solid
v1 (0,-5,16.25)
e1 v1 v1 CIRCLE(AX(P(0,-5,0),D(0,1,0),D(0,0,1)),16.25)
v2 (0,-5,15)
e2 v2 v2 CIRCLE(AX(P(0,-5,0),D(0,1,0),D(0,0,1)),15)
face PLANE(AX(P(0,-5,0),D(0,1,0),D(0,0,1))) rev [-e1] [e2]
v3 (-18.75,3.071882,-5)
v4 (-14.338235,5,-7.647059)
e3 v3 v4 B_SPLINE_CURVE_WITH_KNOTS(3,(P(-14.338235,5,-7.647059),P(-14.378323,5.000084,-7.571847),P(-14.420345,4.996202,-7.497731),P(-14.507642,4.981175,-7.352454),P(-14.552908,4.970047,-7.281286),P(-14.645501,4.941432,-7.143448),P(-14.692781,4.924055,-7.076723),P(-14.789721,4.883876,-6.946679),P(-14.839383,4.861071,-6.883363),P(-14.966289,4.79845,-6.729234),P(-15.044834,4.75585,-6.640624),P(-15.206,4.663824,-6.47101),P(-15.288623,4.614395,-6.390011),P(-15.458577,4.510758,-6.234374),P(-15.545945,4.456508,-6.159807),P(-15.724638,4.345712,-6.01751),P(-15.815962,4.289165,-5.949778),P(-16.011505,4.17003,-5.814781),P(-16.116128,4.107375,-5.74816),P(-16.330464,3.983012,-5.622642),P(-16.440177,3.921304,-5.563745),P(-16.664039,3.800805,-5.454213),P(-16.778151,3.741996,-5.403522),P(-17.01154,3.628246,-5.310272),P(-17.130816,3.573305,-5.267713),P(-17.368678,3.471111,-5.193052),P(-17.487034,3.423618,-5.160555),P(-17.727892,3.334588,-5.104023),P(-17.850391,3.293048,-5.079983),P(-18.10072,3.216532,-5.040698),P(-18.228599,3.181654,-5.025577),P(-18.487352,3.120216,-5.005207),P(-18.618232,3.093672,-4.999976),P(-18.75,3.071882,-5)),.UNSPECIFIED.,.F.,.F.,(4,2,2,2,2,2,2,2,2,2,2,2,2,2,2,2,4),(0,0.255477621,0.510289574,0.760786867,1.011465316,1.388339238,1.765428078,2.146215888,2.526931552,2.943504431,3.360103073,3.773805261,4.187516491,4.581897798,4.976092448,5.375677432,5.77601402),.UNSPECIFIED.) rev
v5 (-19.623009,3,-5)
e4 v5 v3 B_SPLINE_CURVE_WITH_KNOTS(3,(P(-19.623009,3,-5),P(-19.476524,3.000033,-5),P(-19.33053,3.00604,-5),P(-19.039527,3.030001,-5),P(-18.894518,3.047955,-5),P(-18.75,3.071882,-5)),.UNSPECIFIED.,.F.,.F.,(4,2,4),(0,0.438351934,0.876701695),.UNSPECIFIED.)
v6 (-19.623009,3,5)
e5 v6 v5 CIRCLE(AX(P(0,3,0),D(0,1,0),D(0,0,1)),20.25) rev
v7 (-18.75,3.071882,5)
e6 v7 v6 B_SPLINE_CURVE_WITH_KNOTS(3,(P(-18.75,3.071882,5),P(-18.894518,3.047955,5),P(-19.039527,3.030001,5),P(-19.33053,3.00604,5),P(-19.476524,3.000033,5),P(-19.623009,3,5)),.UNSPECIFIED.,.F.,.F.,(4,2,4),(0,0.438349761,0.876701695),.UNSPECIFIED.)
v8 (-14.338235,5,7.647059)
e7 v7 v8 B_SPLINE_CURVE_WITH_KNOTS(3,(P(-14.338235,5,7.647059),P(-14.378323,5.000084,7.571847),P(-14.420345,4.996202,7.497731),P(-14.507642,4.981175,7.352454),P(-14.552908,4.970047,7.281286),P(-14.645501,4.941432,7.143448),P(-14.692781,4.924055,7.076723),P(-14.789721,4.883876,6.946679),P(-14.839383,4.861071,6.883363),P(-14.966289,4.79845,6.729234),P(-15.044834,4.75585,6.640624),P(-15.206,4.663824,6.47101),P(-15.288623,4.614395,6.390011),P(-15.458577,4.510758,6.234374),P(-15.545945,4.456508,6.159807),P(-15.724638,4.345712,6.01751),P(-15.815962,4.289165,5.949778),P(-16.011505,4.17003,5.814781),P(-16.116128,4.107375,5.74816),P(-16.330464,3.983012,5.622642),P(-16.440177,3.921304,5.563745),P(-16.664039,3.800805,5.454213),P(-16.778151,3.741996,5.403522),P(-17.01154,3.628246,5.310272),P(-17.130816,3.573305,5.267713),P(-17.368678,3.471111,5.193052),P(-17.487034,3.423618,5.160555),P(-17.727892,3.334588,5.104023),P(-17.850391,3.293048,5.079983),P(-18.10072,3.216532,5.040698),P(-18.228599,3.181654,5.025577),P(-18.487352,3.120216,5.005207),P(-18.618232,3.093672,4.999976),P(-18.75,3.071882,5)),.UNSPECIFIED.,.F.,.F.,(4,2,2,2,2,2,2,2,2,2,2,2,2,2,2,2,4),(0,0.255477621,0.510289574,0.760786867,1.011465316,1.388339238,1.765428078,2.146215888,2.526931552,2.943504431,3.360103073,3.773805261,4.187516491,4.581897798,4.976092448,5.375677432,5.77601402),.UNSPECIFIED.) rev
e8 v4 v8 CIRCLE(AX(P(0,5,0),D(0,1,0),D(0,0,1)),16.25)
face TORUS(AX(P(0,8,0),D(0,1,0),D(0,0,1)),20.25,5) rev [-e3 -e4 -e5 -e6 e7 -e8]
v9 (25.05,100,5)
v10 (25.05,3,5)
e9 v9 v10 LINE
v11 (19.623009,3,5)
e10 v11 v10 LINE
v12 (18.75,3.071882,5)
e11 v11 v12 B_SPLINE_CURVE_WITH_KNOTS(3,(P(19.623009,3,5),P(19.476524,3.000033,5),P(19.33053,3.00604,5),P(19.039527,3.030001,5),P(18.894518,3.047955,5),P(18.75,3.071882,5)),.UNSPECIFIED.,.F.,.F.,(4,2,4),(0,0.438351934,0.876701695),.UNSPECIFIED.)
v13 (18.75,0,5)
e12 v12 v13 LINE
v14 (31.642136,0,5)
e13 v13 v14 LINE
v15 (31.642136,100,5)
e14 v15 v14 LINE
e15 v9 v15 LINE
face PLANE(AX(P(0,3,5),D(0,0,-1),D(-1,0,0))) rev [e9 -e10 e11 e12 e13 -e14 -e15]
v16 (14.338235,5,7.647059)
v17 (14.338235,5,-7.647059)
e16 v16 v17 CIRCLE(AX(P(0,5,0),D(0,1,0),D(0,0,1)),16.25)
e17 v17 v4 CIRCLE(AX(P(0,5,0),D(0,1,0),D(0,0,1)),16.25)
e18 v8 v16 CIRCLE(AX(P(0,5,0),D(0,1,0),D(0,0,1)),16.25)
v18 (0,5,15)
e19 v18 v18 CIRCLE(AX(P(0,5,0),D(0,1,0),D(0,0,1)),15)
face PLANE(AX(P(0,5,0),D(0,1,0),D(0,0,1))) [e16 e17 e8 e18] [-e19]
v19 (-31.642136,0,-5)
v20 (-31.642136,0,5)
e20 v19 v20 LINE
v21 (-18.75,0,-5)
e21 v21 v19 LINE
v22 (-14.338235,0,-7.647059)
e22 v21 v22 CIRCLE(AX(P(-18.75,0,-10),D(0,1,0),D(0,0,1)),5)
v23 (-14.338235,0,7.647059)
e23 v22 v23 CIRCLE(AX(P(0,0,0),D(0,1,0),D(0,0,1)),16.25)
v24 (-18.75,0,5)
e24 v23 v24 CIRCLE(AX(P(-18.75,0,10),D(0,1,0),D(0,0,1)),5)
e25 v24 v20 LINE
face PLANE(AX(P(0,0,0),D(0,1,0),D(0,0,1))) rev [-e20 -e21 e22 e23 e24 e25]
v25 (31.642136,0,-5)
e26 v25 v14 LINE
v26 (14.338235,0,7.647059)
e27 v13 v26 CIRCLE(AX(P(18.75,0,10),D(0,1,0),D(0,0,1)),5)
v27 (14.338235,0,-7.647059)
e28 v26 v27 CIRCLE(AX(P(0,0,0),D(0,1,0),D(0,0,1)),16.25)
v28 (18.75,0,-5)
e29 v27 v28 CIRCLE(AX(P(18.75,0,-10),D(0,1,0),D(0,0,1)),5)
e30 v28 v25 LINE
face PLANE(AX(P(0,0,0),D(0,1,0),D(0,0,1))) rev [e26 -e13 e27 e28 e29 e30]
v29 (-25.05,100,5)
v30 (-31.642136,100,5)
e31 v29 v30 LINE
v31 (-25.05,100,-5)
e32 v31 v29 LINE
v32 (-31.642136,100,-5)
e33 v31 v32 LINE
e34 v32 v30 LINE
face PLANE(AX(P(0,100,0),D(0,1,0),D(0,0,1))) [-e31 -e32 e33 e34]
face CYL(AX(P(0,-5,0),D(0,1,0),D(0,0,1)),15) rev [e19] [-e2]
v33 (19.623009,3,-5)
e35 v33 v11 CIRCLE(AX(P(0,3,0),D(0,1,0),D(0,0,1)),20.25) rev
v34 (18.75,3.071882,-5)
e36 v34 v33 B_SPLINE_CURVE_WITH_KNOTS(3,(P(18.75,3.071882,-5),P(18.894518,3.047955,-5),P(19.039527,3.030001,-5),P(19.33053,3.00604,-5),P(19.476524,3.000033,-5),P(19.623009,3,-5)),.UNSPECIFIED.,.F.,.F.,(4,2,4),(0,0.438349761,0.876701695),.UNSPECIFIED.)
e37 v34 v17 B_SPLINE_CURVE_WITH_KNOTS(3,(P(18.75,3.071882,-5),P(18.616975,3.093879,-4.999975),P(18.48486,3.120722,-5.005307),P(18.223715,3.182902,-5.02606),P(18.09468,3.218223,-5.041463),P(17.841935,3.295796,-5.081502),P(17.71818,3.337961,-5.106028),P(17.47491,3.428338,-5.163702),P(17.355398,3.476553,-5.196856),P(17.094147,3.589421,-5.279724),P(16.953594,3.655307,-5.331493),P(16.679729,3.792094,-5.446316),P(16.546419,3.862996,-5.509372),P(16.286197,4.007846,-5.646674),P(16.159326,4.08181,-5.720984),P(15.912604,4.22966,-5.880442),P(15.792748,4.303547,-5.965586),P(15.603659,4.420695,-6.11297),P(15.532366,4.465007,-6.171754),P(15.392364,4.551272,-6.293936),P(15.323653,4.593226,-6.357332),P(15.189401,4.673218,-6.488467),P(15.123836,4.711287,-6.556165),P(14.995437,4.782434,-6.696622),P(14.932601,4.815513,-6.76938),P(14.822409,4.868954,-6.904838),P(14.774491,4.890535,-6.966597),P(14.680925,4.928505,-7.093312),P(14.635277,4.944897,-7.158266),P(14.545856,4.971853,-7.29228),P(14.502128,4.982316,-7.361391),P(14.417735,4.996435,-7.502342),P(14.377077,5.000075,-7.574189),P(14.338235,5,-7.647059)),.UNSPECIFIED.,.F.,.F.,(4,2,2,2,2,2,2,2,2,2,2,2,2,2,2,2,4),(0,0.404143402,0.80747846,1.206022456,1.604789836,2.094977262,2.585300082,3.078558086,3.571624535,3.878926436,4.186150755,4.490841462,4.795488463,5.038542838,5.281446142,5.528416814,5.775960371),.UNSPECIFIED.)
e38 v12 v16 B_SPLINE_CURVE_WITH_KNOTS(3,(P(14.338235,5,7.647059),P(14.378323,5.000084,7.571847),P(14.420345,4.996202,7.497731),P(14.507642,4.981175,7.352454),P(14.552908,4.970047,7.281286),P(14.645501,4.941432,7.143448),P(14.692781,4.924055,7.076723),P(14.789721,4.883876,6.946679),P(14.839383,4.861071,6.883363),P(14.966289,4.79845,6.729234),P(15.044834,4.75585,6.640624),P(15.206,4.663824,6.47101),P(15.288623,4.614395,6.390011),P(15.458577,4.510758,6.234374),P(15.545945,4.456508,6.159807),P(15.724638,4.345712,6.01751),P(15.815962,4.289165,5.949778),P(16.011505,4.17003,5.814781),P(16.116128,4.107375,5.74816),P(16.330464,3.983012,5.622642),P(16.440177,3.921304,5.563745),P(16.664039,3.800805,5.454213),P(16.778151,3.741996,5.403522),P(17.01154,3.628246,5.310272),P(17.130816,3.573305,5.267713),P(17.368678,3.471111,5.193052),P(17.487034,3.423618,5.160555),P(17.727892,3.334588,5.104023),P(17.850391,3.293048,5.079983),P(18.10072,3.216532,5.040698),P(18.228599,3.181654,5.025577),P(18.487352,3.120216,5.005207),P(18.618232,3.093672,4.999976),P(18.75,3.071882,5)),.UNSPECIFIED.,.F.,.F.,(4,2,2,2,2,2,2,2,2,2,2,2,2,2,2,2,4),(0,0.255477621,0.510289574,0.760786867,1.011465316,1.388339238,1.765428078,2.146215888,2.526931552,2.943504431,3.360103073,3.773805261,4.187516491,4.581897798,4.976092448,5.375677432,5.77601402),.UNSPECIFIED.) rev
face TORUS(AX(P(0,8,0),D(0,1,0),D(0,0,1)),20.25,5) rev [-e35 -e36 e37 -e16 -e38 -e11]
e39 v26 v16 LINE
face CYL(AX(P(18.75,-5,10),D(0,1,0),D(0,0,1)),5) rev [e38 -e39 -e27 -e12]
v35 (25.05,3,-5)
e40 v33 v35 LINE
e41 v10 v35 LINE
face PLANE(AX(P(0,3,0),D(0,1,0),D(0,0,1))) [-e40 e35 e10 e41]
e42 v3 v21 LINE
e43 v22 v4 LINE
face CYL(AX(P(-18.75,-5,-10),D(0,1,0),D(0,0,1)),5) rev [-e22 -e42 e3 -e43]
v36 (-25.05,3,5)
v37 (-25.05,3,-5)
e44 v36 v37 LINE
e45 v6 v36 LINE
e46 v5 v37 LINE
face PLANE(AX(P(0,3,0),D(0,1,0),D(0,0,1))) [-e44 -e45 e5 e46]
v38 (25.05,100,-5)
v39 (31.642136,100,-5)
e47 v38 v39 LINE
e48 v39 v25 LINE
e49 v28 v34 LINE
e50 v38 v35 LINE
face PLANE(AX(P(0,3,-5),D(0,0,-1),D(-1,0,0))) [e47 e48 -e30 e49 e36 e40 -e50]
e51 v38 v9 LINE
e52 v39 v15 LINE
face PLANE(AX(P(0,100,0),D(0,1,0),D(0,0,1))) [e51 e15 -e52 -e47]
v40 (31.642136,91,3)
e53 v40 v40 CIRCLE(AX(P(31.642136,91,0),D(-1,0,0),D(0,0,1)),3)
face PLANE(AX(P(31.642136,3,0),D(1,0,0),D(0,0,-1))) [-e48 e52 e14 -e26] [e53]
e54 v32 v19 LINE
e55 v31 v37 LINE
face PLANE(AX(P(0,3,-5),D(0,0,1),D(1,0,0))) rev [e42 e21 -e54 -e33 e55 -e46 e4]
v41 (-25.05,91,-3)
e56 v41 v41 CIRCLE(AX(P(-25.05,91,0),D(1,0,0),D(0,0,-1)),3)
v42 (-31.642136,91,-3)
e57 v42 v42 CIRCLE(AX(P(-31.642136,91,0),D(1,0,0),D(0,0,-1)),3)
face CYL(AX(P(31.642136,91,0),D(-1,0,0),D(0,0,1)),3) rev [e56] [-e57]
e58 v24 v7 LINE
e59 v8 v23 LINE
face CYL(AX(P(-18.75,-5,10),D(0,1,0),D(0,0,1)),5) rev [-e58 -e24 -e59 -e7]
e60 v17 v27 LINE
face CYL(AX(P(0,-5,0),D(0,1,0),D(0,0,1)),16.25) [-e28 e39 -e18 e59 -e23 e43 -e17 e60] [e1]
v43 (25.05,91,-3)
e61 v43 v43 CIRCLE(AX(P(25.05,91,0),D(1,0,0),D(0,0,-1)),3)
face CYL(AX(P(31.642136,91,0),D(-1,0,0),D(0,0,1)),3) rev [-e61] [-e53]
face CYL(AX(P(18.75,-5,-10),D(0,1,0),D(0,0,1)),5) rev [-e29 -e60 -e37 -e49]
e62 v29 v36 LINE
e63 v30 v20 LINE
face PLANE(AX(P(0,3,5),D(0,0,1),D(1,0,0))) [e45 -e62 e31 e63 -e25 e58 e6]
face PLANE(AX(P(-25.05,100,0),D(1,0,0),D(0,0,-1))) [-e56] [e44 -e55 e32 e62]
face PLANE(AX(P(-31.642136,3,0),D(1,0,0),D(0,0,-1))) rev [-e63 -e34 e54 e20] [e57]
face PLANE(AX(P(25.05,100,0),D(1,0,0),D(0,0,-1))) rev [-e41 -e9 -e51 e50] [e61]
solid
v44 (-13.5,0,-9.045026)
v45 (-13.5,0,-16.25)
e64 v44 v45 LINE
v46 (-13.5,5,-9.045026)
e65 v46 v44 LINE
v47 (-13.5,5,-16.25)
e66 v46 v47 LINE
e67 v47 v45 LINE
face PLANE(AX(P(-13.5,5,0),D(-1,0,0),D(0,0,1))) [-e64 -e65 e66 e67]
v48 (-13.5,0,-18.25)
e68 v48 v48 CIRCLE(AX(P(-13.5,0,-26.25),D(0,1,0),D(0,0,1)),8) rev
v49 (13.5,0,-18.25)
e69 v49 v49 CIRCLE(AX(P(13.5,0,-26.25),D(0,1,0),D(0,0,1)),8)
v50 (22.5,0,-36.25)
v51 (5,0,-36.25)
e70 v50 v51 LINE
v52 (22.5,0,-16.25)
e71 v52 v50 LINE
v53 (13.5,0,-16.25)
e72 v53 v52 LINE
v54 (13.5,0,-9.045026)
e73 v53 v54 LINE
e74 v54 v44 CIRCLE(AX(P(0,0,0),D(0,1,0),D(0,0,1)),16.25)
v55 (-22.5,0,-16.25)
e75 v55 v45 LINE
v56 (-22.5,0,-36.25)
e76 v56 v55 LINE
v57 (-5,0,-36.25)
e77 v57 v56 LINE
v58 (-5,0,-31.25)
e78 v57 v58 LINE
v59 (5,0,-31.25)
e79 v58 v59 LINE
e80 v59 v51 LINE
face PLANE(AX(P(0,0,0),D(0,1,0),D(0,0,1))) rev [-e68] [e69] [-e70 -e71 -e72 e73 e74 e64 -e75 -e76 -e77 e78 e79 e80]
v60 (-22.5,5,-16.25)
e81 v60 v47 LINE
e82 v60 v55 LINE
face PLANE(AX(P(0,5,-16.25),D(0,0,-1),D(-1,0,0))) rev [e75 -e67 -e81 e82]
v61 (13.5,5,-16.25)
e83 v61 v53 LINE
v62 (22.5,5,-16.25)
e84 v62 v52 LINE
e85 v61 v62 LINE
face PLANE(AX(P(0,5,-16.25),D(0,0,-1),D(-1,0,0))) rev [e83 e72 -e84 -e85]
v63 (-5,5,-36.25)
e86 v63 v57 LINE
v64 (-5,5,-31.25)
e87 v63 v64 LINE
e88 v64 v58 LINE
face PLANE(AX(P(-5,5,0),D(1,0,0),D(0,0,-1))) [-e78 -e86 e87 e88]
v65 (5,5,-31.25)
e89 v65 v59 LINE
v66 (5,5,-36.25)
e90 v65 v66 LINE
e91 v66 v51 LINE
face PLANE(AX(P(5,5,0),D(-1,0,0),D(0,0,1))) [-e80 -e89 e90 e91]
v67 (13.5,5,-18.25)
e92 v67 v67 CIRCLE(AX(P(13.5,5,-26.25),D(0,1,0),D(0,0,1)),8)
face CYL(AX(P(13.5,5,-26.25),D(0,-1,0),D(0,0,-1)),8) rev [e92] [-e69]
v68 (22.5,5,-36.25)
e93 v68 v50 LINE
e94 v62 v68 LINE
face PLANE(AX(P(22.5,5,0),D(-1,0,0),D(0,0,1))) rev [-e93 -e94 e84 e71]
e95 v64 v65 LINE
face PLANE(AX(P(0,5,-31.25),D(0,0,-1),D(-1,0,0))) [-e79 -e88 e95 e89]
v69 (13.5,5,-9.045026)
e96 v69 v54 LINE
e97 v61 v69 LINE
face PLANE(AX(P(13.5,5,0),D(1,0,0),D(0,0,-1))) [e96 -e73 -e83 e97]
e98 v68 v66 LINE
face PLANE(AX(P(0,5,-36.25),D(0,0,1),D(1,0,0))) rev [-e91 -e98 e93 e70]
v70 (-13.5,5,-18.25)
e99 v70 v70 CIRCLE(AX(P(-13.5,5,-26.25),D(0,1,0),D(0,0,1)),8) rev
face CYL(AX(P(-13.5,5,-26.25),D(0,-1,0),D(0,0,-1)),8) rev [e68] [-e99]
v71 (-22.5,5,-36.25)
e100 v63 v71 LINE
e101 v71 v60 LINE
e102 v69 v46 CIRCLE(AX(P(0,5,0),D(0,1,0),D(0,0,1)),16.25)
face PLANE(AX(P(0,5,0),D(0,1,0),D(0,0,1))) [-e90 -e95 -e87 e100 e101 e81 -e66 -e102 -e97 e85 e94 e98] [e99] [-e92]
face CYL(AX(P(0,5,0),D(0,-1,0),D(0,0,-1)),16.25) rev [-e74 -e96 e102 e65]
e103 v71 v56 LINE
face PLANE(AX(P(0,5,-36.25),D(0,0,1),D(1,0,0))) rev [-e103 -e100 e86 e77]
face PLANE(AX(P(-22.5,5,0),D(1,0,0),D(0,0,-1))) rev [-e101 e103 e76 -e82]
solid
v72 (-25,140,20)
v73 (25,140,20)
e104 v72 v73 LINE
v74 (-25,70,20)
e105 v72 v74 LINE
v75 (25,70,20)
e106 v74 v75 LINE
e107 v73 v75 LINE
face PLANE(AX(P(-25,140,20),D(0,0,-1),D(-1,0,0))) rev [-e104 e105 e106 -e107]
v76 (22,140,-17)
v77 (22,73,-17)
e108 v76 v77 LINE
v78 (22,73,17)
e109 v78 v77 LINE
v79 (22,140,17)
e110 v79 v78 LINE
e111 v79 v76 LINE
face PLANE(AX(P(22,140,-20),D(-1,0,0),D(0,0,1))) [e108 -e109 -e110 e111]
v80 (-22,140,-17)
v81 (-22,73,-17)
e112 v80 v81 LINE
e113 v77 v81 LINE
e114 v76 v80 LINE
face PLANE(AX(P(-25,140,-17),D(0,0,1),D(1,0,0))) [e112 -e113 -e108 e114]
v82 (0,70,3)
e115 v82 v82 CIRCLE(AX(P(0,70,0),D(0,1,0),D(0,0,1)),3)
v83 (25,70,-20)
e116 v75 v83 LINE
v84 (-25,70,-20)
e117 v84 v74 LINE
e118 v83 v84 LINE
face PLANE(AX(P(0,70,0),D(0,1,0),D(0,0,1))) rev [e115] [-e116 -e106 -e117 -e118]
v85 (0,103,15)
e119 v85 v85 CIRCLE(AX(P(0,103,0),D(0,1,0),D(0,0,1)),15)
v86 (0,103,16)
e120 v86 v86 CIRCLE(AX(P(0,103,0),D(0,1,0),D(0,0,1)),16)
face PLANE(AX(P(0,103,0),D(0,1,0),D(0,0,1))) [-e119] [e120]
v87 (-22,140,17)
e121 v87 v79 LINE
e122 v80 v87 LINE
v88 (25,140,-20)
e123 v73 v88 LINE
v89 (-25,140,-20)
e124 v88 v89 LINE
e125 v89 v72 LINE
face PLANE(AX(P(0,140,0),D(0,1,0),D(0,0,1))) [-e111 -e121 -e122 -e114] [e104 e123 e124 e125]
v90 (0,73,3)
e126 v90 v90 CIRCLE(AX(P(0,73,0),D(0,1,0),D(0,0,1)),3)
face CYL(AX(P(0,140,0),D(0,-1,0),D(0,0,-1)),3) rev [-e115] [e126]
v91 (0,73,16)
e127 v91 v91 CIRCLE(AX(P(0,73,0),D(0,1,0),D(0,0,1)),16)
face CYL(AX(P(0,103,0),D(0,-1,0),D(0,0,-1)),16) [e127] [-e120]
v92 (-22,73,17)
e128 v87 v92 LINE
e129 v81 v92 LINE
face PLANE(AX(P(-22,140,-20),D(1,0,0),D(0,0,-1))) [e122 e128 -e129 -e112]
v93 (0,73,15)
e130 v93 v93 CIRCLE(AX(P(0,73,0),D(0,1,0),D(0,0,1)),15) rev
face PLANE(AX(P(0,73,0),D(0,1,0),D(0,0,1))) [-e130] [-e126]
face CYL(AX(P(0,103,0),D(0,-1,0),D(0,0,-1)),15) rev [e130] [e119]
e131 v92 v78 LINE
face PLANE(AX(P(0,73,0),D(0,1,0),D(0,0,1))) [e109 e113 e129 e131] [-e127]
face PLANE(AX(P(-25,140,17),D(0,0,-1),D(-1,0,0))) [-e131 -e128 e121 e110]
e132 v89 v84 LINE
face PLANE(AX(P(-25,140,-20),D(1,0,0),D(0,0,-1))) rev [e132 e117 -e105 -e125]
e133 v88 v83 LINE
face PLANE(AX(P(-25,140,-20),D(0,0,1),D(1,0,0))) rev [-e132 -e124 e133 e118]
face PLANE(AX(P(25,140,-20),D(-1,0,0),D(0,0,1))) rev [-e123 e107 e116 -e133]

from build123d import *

# Parameters (mm, degrees)
CONNECTOR_SLEEVE_DEPTH        = 5
CONNECTOR_SLEEVE_DEPTH_BACK   = 5
SKETCH3_W                     = 50
SKETCH3_H                     = 40
SKETCH3_R                     = 3
MOTOR_CASING_DEPTH            = 70
SHELL4_T                      = -3
SKETCH6_R                     = 16
SKETCH6_R_2                   = 15
MOTOR_SITS_HERE_DEPTH         = 30
SKETCH2_16_W                  = 6.592135624
SKETCH2_16_H                  = 10
SLEEVE_CASING_CONNECTOR_DEPTH = 3
SKETCH2_17_W                  = 6.592135624
SKETCH2_17_H                  = 10
SLEEVE_CASING_ARMS_DEPTH      = 100
SKETCH2_10_R                  = 8
SENSOR_HOLDER_DEPTH           = 5
FILLET2_R                     = 5
CUT_EXTRUDE5_DEPTH            = 124.769792437
CUT_EXTRUDE5_DEPTH_BACK       = 124.769792437
SKETCH8_R                     = 3


with BuildPart() as part:
    # Sketch2 → Connector sleeve (new, two sides: drawn at the far end of the back side and taken through both)
    with BuildSketch(Plane(origin=(0, 0, 0), x_dir=(1, 0, 0), z_dir=(0, 1, 0)).offset(-CONNECTOR_SLEEVE_DEPTH_BACK)):
        with BuildLine():
            Line((-14.142135624, -5), (-15.461646096, -5))
            ThreePointArc((-15.461646096, -5), (0, -16.25), (15.461646096, -5))
            Line((15.461646096, -5), (14.142135624, -5))
            ThreePointArc((14.142135624, -5), (0, -15), (-14.142135624, -5))
        make_face()
        with BuildLine():
            ThreePointArc((-13.5, 9.045026258), (-14.62138145, 7.090677295), (-15.461646096, 5))
            Line((-15.461646096, 5), (-14.142135624, 5))
            ThreePointArc((-14.142135624, 5), (0, 15), (14.142135624, 5))
            Line((14.142135624, 5), (15.461646096, 5))
            ThreePointArc((15.461646096, 5), (14.62138145, 7.090677295), (13.5, 9.045026258))
            ThreePointArc((13.5, 9.045026258), (7.651170607, 14.336041586), (0, 16.25))
            ThreePointArc((0, 16.25), (-7.651170607, 14.336041586), (-13.5, 9.045026258))
        make_face()
        with BuildLine():
            Line((15.461646096, 5), (14.142135624, 5))
            ThreePointArc((14.142135624, 5), (14.783978395, 2.536529681), (15, 0))
            ThreePointArc((15, 0), (14.783978395, -2.536529681), (14.142135624, -5))
            Line((14.142135624, -5), (15.461646096, -5))
            ThreePointArc((15.461646096, -5), (16.051701609, -2.530884326), (16.25, 0))
            ThreePointArc((16.25, 0), (16.051701609, 2.530884326), (15.461646096, 5))
        make_face()
        with BuildLine():
            Line((-14.142135624, 5), (-15.461646096, 5))
            ThreePointArc((-15.461646096, 5), (-16.25, 0), (-15.461646096, -5))
            Line((-15.461646096, -5), (-14.142135624, -5))
            ThreePointArc((-14.142135624, -5), (-15, 0), (-14.142135624, 5))
        make_face()
    extrude(amount=CONNECTOR_SLEEVE_DEPTH + CONNECTOR_SLEEVE_DEPTH_BACK)

    # Sketch2<16> → Sleeve-casing connector (add)
    with BuildSketch(Plane(origin=(0, 0, 0), x_dir=(1, 0, 0), z_dir=(0, 1, 0))):
        with BuildLine():
            Line((-15.461646096, 5), (-25.05, 5))
            Line((-25.05, 5), (-25.05, -5))
            Line((-25.05, -5), (-15.461646096, -5))
            ThreePointArc((-15.461646096, -5), (-16.25, 0), (-15.461646096, 5))
        make_face()
        with Locations((-28.346067812, 0)):
            Rectangle(SKETCH2_16_W, SKETCH2_16_H)
        with BuildLine():
            ThreePointArc((16.25, 0), (16.051701609, -2.530884326), (15.461646096, -5))
            Line((15.461646096, -5), (25.05, -5))
            Line((25.05, -5), (25.05, 5))
            Line((25.05, 5), (15.461646096, 5))
            ThreePointArc((15.461646096, 5), (16.051701609, 2.530884326), (16.25, 0))
        make_face()
        with Locations((28.346067812, 0)):
            Rectangle(SKETCH2_16_W, SKETCH2_16_H)
    extrude(amount=SLEEVE_CASING_CONNECTOR_DEPTH)

    # Sketch2<17> → Sleeve-casing arms (add)
    with BuildSketch(Plane(origin=(0, 0, 0), x_dir=(1, 0, 0), z_dir=(0, 1, 0))):
        with Locations((-28.346067812, 0)):
            Rectangle(SKETCH2_17_W, SKETCH2_17_H)
        with Locations((28.346067812, 0)):
            Rectangle(SKETCH2_17_W, SKETCH2_17_H)
    extrude(amount=SLEEVE_CASING_ARMS_DEPTH)

    # Fillet2
    # the kernel refuses this fillet: 5 mm, written as the material it adds along each edge
    with BuildSketch(Plane(origin=(0, 3, 0), x_dir=(-0.5992835092298462, 0, 0.8005368670868074), z_dir=(0.8005368670868074, 0, 0.5992835092298462))) as fillet2_piece_1_section:
        with BuildLine():
            CenterArc((20.25, -5), FILLET2_R, 90, 53.130102354)
            Line((20.25, 0), (20.25, 0.1))
            Line((20.25, 0.1), (16.25, 0.1))
            Line((16.25, 0.1), (16.15, 0))
            ThreePointArc((16.15, 0), (16.15, -1), (16.17, -1.94))
            Line((16.17, -1.94), (16.25, -2))
        make_face()
    fillet2_piece_1 = revolve(axis=Axis((0, 3, 0), (0, -1, 0)), revolution_arc=106.362800019, mode=Mode.PRIVATE)
    fillet2_piece_1 = split(fillet2_piece_1, bisect_by=Plane(origin=(-17.030163823, 3.512375165, -5), z_dir=(0, 0, 1)), keep=Keep.TOP, mode=Mode.PRIVATE)
    fillet2_piece_1 = split(fillet2_piece_1, bisect_by=Plane(origin=(-17.030163823, 3.512375165, 5), z_dir=(0, 0, -1)), keep=Keep.TOP, mode=Mode.PRIVATE)
    add(fillet2_piece_1)
    with BuildSketch(Plane(origin=(-15.461646096, 0, 5), x_dir=(0.3906724879832055, 0, 0.9205297426661521), z_dir=(0, 1, 0)), Plane(origin=(15.461646096, 0, -5), x_dir=(-0.39067248798317566, 0, -0.9205297426661648), z_dir=(0, 1, 0))) as fillet2_piece_2:
        with BuildLine():
            CenterArc((3.317979312, -4.980390013), FILLET2_R, 95.076136898, 61.927513064)
            Line((-1.284669401, -3.027027573), (-1.376722375, -2.987960324))
            Line((-1.376722375, -2.987960324), (-0.092052974, 0.039067249))
            Line((-0.092052974, 0.039067249), (0.008847945, 0.0996078))
            ThreePointArc((0.008847945, 0.0996078), (1.437791035, 0.036267542), (2.866734126, 0.0996078))
            Line((2.866734126, 0.0996078), (2.875582071, 0))
        make_face()
    extrude(amount=3)
    with BuildSketch(Plane(origin=(-15.461646096, 0, -5), x_dir=(0.3906724879831855, 0, -0.9205297426661605), z_dir=(0, 1, 0)), Plane(origin=(15.461646096, 0, 5), x_dir=(-0.3906724879831673, 0, 0.9205297426661683), z_dir=(0, 1, 0))) as fillet2_piece_3:
        with BuildLine():
            CenterArc((3.317979312, 4.980390013), FILLET2_R, 202.996350038, 61.927513064)
            Line((-1.284669401, 3.027027573), (-1.376722375, 2.987960324))
            Line((-1.376722375, 2.987960324), (-0.092052974, -0.039067249))
            Line((-0.092052974, -0.039067249), (0.008847945, -0.0996078))
            ThreePointArc((0.008847945, -0.0996078), (1.437791035, -0.036267542), (2.866734126, -0.0996078))
            Line((2.866734126, -0.0996078), (2.875582071, 0))
        make_face()
    extrude(amount=3)
    with BuildSketch(Plane(origin=(0, 3, 0), x_dir=(0.5992835092298779, 0, 0.8005368670867836), z_dir=(-0.8005368670867836, 0, 0.5992835092298779))) as fillet2_piece_4_section:
        with BuildLine():
            CenterArc((20.25, 5), FILLET2_R, 216.869897646, 53.130102354)
            Line((20.25, 0), (20.25, -0.1))
            Line((20.25, -0.1), (16.25, -0.1))
            Line((16.25, -0.1), (16.15, 0))
            ThreePointArc((16.15, 0), (16.15, 1), (16.17, 1.94))
            Line((16.17, 1.94), (16.25, 2))
        make_face()
    fillet2_piece_4 = revolve(axis=Axis((0, 3, 0), (0, 1, 0)), revolution_arc=106.362800019, mode=Mode.PRIVATE)
    fillet2_piece_4 = split(fillet2_piece_4, bisect_by=Plane(origin=(17.030163823, 3.512375165, 5), z_dir=(0, 0, -1)), keep=Keep.TOP, mode=Mode.PRIVATE)
    fillet2_piece_4 = split(fillet2_piece_4, bisect_by=Plane(origin=(17.030163823, 3.512375165, -5), z_dir=(0, 0, 1)), keep=Keep.TOP, mode=Mode.PRIVATE)
    add(fillet2_piece_4)
    with BuildSketch(Plane(origin=(0, 3, 0), x_dir=(-0.5992835092298462, 0, 0.8005368670868074), z_dir=(0.8005368670868074, 0, 0.5992835092298462))) as fillet2_piece_5a_section:
        with BuildLine():
            CenterArc((20.25, -5), FILLET2_R, 90, 53.130102354)
            Line((20.25, 0), (20.25, 0.1))
            Line((20.25, 0.1), (16.25, 0.1))
            Line((16.25, 0.1), (16.15, 0))
            ThreePointArc((16.15, 0), (16.15, -1), (16.17, -1.94))
            Line((16.17, -1.94), (16.25, -2))
        make_face()
    fillet2_piece_5a = revolve(axis=Axis((0, 3, 0), (0, -1, 0)), revolution_arc=106.362800019, mode=Mode.PRIVATE)
    fillet2_piece_5a = split(fillet2_piece_5a, bisect_by=Plane(origin=(-13.980724367, 3.489518258, 5), z_dir=(0, 0, 1)), keep=Keep.TOP, mode=Mode.PRIVATE)
    with BuildSketch(Plane(origin=(-15.461646096, 0, 5), x_dir=(0.3906724879832055, 0, 0.9205297426661521), z_dir=(0, 1, 0))) as fillet2_piece_5b_section:
        with BuildLine():
            CenterArc((3.317979312, -4.980390013), FILLET2_R, 95.076136898, 61.927513064)
            Line((-1.284669401, -3.027027573), (-1.376722375, -2.987960324))
            Line((-1.376722375, -2.987960324), (-0.092052974, 0.039067249))
            Line((-0.092052974, 0.039067249), (0.008847945, 0.0996078))
            ThreePointArc((0.008847945, 0.0996078), (1.437791035, 0.036267542), (2.866734126, 0.0996078))
            Line((2.866734126, 0.0996078), (2.875582071, 0))
        make_face()
    fillet2_piece_5b = extrude(amount=11.22088476, mode=Mode.PRIVATE)
    fillet2_piece_5b = split(fillet2_piece_5b, bisect_by=Plane(origin=(-15.995215442, 5, 5.576522303), z_dir=(0, -1, 0)), keep=Keep.TOP, mode=Mode.PRIVATE)
    fillet2_piece_5b = split(fillet2_piece_5b, bisect_by=Plane(origin=(-15.995215442, 3, 5.576522303), z_dir=(0, 1, 0)), keep=Keep.TOP, mode=Mode.PRIVATE)
    fillet2_piece_5 = fillet2_piece_5a & fillet2_piece_5b
    add(fillet2_piece_5)
    with BuildSketch(Plane(origin=(-15.461646096, 0, -5), x_dir=(0.3906724879831855, 0, -0.9205297426661605), z_dir=(0, 1, 0))) as fillet2_piece_6a_section:
        with BuildLine():
            CenterArc((3.317979312, 4.980390013), FILLET2_R, 202.996350038, 61.927513064)
            Line((-1.284669401, 3.027027573), (-1.376722375, 2.987960324))
            Line((-1.376722375, 2.987960324), (-0.092052974, -0.039067249))
            Line((-0.092052974, -0.039067249), (0.008847945, -0.0996078))
            ThreePointArc((0.008847945, -0.0996078), (1.437791035, -0.036267542), (2.866734126, -0.0996078))
            Line((2.866734126, -0.0996078), (2.875582071, 0))
        make_face()
    fillet2_piece_6a = extrude(amount=11.22088476, mode=Mode.PRIVATE)
    fillet2_piece_6a = split(fillet2_piece_6a, bisect_by=Plane(origin=(-15.995215442, 5, -5.576522303), z_dir=(0, -1, 0)), keep=Keep.TOP, mode=Mode.PRIVATE)
    fillet2_piece_6a = split(fillet2_piece_6a, bisect_by=Plane(origin=(-15.995215442, 3, -5.576522303), z_dir=(0, 1, 0)), keep=Keep.TOP, mode=Mode.PRIVATE)
    with BuildSketch(Plane(origin=(0, 3, 0), x_dir=(-0.5992835092298462, 0, 0.8005368670868074), z_dir=(0.8005368670868074, 0, 0.5992835092298462))) as fillet2_piece_6b_section:
        with BuildLine():
            CenterArc((20.25, -5), FILLET2_R, 90, 53.130102354)
            Line((20.25, 0), (20.25, 0.1))
            Line((20.25, 0.1), (16.25, 0.1))
            Line((16.25, 0.1), (16.15, 0))
            ThreePointArc((16.15, 0), (16.15, -1), (16.17, -1.94))
            Line((16.17, -1.94), (16.25, -2))
        make_face()
    fillet2_piece_6b = revolve(axis=Axis((0, 3, 0), (0, -1, 0)), revolution_arc=106.362800019, mode=Mode.PRIVATE)
    fillet2_piece_6b = split(fillet2_piece_6b, bisect_by=Plane(origin=(-13.980724067, 3.489518328, -5), z_dir=(0, 0, -1)), keep=Keep.TOP, mode=Mode.PRIVATE)
    fillet2_piece_6 = fillet2_piece_6a & fillet2_piece_6b
    add(fillet2_piece_6)
    with BuildSketch(Plane(origin=(15.461646096, 0, 5), x_dir=(-0.3906724879831673, 0, 0.9205297426661683), z_dir=(0, 1, 0))) as fillet2_piece_7a_section:
        with BuildLine():
            CenterArc((3.317979312, 4.980390013), FILLET2_R, 202.996350038, 61.927513064)
            Line((-1.284669401, 3.027027573), (-1.376722375, 2.987960324))
            Line((-1.376722375, 2.987960324), (-0.092052974, -0.039067249))
            Line((-0.092052974, -0.039067249), (0.008847945, -0.0996078))
            ThreePointArc((0.008847945, -0.0996078), (1.437791035, -0.036267542), (2.866734126, -0.0996078))
            Line((2.866734126, -0.0996078), (2.875582071, 0))
        make_face()
    fillet2_piece_7a = extrude(amount=11.22088476, mode=Mode.PRIVATE)
    fillet2_piece_7a = split(fillet2_piece_7a, bisect_by=Plane(origin=(15.995215442, 5, 5.576522303), z_dir=(0, -1, 0)), keep=Keep.TOP, mode=Mode.PRIVATE)
    fillet2_piece_7a = split(fillet2_piece_7a, bisect_by=Plane(origin=(15.995215442, 3, 5.576522303), z_dir=(0, 1, 0)), keep=Keep.TOP, mode=Mode.PRIVATE)
    with BuildSketch(Plane(origin=(0, 3, 0), x_dir=(0.5992835092298779, 0, 0.8005368670867836), z_dir=(-0.8005368670867836, 0, 0.5992835092298779))) as fillet2_piece_7b_section:
        with BuildLine():
            CenterArc((20.25, 5), FILLET2_R, 216.869897646, 53.130102354)
            Line((20.25, 0), (20.25, -0.1))
            Line((20.25, -0.1), (16.25, -0.1))
            Line((16.25, -0.1), (16.15, 0))
            ThreePointArc((16.15, 0), (16.15, 1), (16.17, 1.94))
            Line((16.17, 1.94), (16.25, 2))
        make_face()
    fillet2_piece_7b = revolve(axis=Axis((0, 3, 0), (0, 1, 0)), revolution_arc=106.362800019, mode=Mode.PRIVATE)
    fillet2_piece_7b = split(fillet2_piece_7b, bisect_by=Plane(origin=(13.980724666, 3.489518219, 5), z_dir=(0, 0, 1)), keep=Keep.TOP, mode=Mode.PRIVATE)
    fillet2_piece_7 = fillet2_piece_7a & fillet2_piece_7b
    add(fillet2_piece_7)
    with BuildSketch(Plane(origin=(0, 3, 0), x_dir=(0.5992835092298779, 0, 0.8005368670867836), z_dir=(-0.8005368670867836, 0, 0.5992835092298779))) as fillet2_piece_8a_section:
        with BuildLine():
            CenterArc((20.25, 5), FILLET2_R, 216.869897646, 53.130102354)
            Line((20.25, 0), (20.25, -0.1))
            Line((20.25, -0.1), (16.25, -0.1))
            Line((16.25, -0.1), (16.15, 0))
            ThreePointArc((16.15, 0), (16.15, 1), (16.17, 1.94))
            Line((16.17, 1.94), (16.25, 2))
        make_face()
    fillet2_piece_8a = revolve(axis=Axis((0, 3, 0), (0, 1, 0)), revolution_arc=106.362800019, mode=Mode.PRIVATE)
    fillet2_piece_8a = split(fillet2_piece_8a, bisect_by=Plane(origin=(13.980723768, 3.489518367, -5), z_dir=(0, 0, -1)), keep=Keep.TOP, mode=Mode.PRIVATE)
    with BuildSketch(Plane(origin=(15.461646096, 0, -5), x_dir=(-0.39067248798317566, 0, -0.9205297426661648), z_dir=(0, 1, 0))) as fillet2_piece_8b_section:
        with BuildLine():
            CenterArc((3.317979312, -4.980390013), FILLET2_R, 95.076136898, 61.927513064)
            Line((-1.284669401, -3.027027573), (-1.376722375, -2.987960324))
            Line((-1.376722375, -2.987960324), (-0.092052974, 0.039067249))
            Line((-0.092052974, 0.039067249), (0.008847945, 0.0996078))
            ThreePointArc((0.008847945, 0.0996078), (1.437791035, 0.036267542), (2.866734126, 0.0996078))
            Line((2.866734126, 0.0996078), (2.875582071, 0))
        make_face()
    fillet2_piece_8b = extrude(amount=11.22088476, mode=Mode.PRIVATE)
    fillet2_piece_8b = split(fillet2_piece_8b, bisect_by=Plane(origin=(15.995215442, 5, -5.576522303), z_dir=(0, -1, 0)), keep=Keep.TOP, mode=Mode.PRIVATE)
    fillet2_piece_8b = split(fillet2_piece_8b, bisect_by=Plane(origin=(15.995215442, 3, -5.576522303), z_dir=(0, 1, 0)), keep=Keep.TOP, mode=Mode.PRIVATE)
    fillet2_piece_8 = fillet2_piece_8a & fillet2_piece_8b
    add(fillet2_piece_8)

    # Sketch8 → Cut-Extrude5 (cut, two sides: drawn at the far end of the back side and taken through both)
    with BuildSketch(Plane.ZY.offset(31.642135624).offset(-CUT_EXTRUDE5_DEPTH_BACK)):
        with Locations((0, 91)):
            Circle(SKETCH8_R)
    extrude(amount=CUT_EXTRUDE5_DEPTH + CUT_EXTRUDE5_DEPTH_BACK, mode=Mode.SUBTRACT)


with BuildPart() as body_2:
    # Sketch3 → Motor casing (new body)
    with BuildSketch(Plane(origin=(0, 30, 0), x_dir=(1, 0, 0), z_dir=(0, 1, 0))):
        Rectangle(SKETCH3_W, SKETCH3_H)
        with Locations(Location((0, 0, 0), (0, 0, 270))):
            Circle(SKETCH3_R, mode=Mode.SUBTRACT)
    extrude(amount=MOTOR_CASING_DEPTH)

    # Shell4
    shell4_openings = [body_2.faces().sort_by_distance(p)[0] for p in [
        (0, 100, -19.359687576),
        (0, 65, -3),
    ]]
    offset(amount=SHELL4_T, openings=shell4_openings, kind=Kind.INTERSECTION)

    # Sketch6 → Motor sits here (add)
    with BuildSketch(Plane(origin=(0, 33, 0), x_dir=(1, 0, 0), z_dir=(0, 1, 0))):
        with Locations(Location((0, 0, 0), (0, 0, 270))):
            Circle(SKETCH6_R)
        with Locations(Location((0, 0, 0), (0, 0, 270))):
            Circle(SKETCH6_R_2, mode=Mode.SUBTRACT)
    extrude(amount=MOTOR_SITS_HERE_DEPTH)


with BuildPart() as body_3:
    # Sketch2<10> → Sensor holder (new body)
    # profile 1 of 3: a face of its own
    with BuildSketch(Plane(origin=(0, 0, 0), x_dir=(1, 0, 0), z_dir=(0, 1, 0))):
        Polygon((5, 31.25), (5, 36.25), (22.5, 36.25), (22.5, 16.25), (0, 16.25), (-22.5, 16.25), (-22.5, 36.25), (-5, 36.25), (-5, 31.25), align=None)
        with Locations(Location((13.5, 26.25, 0), (0, 0, 270))):
            Circle(SKETCH2_10_R, mode=Mode.SUBTRACT)
        with Locations(Location((-13.5, 26.25, 0), (0, 0, 270))):
            Circle(SKETCH2_10_R, mode=Mode.SUBTRACT)
    # profile 2 of 3: a face of its own
    with BuildSketch(Plane(origin=(0, 0, 0), x_dir=(1, 0, 0), z_dir=(0, 1, 0))):
        with BuildLine():
            Line((-13.5, 16.25), (-13.5, 9.045026258))
            ThreePointArc((-13.5, 9.045026258), (-7.651170607, 14.336041586), (0, 16.25))
            Line((0, 16.25), (-13.5, 16.25))
        make_face()
    # profile 3 of 3: a face of its own
    with BuildSketch(Plane(origin=(0, 0, 0), x_dir=(1, 0, 0), z_dir=(0, 1, 0))):
        with BuildLine():
            Line((13.5, 16.25), (0, 16.25))
            ThreePointArc((0, 16.25), (7.651170607, 14.336041586), (13.5, 9.045026258))
            Line((13.5, 9.045026258), (13.5, 16.25))
        make_face()
    extrude(amount=SENSOR_HOLDER_DEPTH)


with BuildPart() as body_2_1:
    # Body-Move/Copy3: moved
    add(body_2.part.moved(Location((0, 40, 0))))


solid = Compound([part.part, body_3.part, body_2_1.part])
